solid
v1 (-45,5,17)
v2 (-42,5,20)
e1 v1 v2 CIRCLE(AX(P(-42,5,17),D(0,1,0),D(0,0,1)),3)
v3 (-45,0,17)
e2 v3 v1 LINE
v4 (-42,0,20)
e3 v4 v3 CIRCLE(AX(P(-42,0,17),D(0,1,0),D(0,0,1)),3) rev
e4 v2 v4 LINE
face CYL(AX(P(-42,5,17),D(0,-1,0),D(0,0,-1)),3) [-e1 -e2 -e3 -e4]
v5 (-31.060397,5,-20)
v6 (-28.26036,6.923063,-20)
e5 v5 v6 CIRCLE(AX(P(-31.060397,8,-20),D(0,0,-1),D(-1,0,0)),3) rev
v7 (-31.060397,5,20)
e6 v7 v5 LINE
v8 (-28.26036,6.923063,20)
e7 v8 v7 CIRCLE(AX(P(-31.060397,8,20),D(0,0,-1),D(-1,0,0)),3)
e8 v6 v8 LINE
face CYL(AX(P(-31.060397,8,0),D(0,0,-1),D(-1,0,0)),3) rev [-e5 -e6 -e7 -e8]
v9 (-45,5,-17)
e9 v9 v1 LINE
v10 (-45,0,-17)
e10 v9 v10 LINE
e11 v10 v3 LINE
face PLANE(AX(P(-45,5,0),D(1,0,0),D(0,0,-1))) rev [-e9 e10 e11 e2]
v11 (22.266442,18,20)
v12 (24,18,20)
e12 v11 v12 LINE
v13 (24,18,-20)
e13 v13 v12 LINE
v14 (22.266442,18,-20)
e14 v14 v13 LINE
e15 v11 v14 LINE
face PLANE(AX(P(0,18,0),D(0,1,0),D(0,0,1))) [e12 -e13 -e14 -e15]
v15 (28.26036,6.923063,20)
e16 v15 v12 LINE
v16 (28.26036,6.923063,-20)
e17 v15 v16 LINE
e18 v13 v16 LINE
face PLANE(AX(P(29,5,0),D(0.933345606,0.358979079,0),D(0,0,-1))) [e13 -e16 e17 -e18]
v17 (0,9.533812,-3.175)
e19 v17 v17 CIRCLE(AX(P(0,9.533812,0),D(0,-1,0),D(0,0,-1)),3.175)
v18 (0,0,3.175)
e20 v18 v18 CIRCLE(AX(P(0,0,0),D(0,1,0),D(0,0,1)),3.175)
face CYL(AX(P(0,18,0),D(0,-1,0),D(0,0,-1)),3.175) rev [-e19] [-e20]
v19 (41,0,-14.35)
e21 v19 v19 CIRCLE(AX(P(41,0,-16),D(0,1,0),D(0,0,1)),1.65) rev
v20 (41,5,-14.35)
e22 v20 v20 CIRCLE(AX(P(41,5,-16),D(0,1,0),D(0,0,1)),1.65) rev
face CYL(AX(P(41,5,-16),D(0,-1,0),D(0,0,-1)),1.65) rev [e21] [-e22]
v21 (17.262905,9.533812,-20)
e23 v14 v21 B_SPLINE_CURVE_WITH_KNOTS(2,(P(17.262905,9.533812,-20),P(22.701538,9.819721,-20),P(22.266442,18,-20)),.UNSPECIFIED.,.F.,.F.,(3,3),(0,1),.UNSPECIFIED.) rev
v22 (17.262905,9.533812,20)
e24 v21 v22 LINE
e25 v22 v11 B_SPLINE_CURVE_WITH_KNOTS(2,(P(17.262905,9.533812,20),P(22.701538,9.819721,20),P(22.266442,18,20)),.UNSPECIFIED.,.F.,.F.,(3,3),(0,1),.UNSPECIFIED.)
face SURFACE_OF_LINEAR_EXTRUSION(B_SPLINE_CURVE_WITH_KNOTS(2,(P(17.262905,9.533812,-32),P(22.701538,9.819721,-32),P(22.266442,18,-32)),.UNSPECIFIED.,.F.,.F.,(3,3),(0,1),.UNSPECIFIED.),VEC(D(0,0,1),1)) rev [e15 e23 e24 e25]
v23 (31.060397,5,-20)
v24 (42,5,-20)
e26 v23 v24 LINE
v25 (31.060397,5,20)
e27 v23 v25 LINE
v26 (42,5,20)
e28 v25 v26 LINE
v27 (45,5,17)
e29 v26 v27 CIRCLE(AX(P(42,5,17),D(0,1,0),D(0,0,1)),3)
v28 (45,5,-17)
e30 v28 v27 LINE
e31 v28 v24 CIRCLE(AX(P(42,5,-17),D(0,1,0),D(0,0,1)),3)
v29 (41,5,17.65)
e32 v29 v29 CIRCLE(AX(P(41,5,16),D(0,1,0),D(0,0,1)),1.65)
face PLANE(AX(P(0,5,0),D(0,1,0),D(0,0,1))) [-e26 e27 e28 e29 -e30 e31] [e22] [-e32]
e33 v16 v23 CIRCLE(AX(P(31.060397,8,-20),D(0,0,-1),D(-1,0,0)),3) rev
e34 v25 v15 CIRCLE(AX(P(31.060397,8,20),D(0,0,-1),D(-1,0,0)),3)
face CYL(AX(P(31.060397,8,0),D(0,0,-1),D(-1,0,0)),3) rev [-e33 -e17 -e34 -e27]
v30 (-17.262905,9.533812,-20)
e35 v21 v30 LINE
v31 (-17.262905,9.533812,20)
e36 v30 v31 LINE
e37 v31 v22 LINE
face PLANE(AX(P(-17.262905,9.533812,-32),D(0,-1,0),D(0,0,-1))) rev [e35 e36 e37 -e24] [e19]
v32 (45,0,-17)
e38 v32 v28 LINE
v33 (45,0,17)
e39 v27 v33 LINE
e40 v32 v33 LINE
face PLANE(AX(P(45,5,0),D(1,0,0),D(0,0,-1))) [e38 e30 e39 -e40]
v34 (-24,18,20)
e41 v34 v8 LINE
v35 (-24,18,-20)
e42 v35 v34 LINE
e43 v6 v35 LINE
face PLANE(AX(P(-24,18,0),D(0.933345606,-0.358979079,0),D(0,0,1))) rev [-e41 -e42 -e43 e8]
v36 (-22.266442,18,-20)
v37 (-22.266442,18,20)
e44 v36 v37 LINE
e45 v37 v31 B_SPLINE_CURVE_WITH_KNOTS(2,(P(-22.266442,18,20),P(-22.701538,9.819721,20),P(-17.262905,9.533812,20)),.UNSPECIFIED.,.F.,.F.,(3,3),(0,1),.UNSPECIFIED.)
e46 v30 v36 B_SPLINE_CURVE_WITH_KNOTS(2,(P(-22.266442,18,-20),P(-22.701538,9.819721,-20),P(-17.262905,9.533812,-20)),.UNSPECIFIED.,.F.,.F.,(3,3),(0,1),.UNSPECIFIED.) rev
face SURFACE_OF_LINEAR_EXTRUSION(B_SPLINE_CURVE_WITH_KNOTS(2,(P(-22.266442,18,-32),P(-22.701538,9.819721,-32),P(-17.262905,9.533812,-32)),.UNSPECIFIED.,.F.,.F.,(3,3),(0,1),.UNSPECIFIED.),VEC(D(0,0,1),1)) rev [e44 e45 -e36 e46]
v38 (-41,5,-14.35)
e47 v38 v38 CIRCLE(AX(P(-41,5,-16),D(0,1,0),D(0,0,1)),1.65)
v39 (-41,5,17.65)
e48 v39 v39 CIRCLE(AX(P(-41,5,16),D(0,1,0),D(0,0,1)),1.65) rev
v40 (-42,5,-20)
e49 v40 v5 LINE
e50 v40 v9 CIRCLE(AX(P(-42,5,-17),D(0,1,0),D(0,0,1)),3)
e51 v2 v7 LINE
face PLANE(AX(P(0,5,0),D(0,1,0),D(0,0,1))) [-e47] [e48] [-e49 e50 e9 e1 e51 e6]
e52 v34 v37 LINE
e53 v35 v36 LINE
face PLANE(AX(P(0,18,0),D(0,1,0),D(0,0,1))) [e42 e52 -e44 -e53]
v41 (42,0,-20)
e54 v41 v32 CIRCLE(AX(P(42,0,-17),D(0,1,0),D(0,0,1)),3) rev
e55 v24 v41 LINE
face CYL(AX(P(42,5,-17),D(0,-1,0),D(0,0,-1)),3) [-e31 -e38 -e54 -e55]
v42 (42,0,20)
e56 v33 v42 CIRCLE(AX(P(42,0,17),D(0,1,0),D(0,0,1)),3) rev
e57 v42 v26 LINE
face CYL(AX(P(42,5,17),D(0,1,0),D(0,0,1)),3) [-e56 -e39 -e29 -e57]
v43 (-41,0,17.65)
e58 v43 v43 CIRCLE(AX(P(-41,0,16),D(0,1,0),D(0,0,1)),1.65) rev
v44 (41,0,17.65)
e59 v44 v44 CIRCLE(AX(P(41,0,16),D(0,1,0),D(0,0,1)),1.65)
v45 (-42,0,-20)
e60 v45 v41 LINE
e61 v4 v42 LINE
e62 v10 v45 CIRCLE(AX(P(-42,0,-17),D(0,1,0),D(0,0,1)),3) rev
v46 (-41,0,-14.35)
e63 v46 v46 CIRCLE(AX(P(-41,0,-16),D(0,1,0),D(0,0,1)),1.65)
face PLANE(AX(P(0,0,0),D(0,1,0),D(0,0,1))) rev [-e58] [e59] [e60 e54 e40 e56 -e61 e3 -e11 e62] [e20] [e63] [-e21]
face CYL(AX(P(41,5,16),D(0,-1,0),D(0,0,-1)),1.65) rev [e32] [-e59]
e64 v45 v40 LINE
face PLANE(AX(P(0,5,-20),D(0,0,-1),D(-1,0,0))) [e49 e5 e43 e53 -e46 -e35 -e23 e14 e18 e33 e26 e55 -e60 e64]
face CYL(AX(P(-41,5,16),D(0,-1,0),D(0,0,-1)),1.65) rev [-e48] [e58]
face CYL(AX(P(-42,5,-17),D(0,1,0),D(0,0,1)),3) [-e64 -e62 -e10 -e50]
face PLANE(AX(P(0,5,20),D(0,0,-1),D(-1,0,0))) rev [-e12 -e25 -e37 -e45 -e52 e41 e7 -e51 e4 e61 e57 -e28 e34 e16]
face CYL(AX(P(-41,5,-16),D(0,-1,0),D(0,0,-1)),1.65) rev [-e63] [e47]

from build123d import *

# Parameters (mm, degrees)
CROQUIS1_W                = 21
CROQUIS1_H                = 40
CROQUIS1_R                = 1.65
SALIENTE_EXTRUIR1_DEPTH   = 5
SALIENTE_EXTRUIR1_2_DEPTH = 5
CROQUIS1_3_W              = 48
CROQUIS1_3_H              = 40
CROQUIS1_3_R              = 3.175
SALIENTE_EXTRUIR2_DEPTH   = 18
CORTAR_EXTRUIR1_DEPTH     = 52
CHAFL_N1_SIZE2            = 13
CHAFL_N1_SIZE             = 5
CHAFL_N2_SIZE2            = 13
CHAFL_N2_SIZE             = 5
REDONDEO1_R               = 3
REDONDEO2_R               = 3


with BuildPart() as part:
    # Croquis1 → Saliente-Extruir1 (new body)
    with BuildSketch(Plane(origin=(0, 0, 0), x_dir=(1, 0, 0), z_dir=(0, 1, 0))):
        with Locations((-34.5, 0)):
            Rectangle(CROQUIS1_W, CROQUIS1_H)
        with Locations(Location((-41, -16, 0), (0, 0, 270))):
            Circle(CROQUIS1_R, mode=Mode.SUBTRACT)
        with Locations(Location((-41, 16, 0), (0, 0, 270))):
            Circle(CROQUIS1_R, mode=Mode.SUBTRACT)
    extrude(amount=SALIENTE_EXTRUIR1_DEPTH)



with BuildPart() as body_2:
    # Croquis1 → Saliente-Extruir1 2 (new body)
    with BuildSketch(Plane(origin=(0, 0, 0), x_dir=(1, 0, 0), z_dir=(0, 1, 0))):
        with Locations((34.5, 0)):
            Rectangle(CROQUIS1_W, CROQUIS1_H)
        with Locations(Location((41, -16, 0), (0, 0, 270))):
            Circle(CROQUIS1_R, mode=Mode.SUBTRACT)
        with Locations(Location((41, 16, 0), (0, 0, 270))):
            Circle(CROQUIS1_R, mode=Mode.SUBTRACT)
    extrude(amount=SALIENTE_EXTRUIR1_2_DEPTH)


with BuildPart() as part_1:
    add(part.part)

    add(body_2.part)  # Saliente-Extruir2 merges body 2
    # Croquis1<3> → Saliente-Extruir2 (add)
    with BuildSketch(Plane(origin=(0, 0, 0), x_dir=(1, 0, 0), z_dir=(0, 1, 0))):
        Rectangle(CROQUIS1_3_W, CROQUIS1_3_H)
        with Locations(Location((0, 0, 0), (0, 0, 270))):
            Circle(CROQUIS1_3_R, mode=Mode.SUBTRACT)
    extrude(amount=SALIENTE_EXTRUIR2_DEPTH)

    # Croquis2 → Cortar-Extruir1 (cut)
    with BuildSketch(Plane.XY.offset(20)):
        with BuildLine():
            Line((-17.262904506, 9.533811896), (17.262904506, 9.533811896))
            add(Edge.make_bspline(
                [(22.266442187, 18), (22.701537977, 9.819720853), (17.262904506, 9.533811896)],
                knots=[0, 0, 0, 1, 1, 1], degree=2))
            Line((22.266442187, 18), (-22.266442187, 18))
            add(Edge.make_bspline(
                [(-22.266442187, 18), (-22.701537977, 9.819720853), (-17.262904506, 9.533811896)],
                knots=[0, 0, 0, 1, 1, 1], degree=2))
        make_face()
    extrude(amount=-CORTAR_EXTRUIR1_DEPTH, mode=Mode.SUBTRACT)

    # Chaflán1
    chafl_n1_edges = [part_1.edges().sort_by_distance(p)[0] for p in [
        (-24, 5, 0),
    ]]
    chafl_n1_side = [part_1.faces().sort_by_distance(p)[0] for p in [
        (-24.1, 5, 0),
    ]]
    chamfer(chafl_n1_edges, length=CHAFL_N1_SIZE - 0.0001, length2=CHAFL_N1_SIZE2 - 0.0001, reference=chafl_n1_side[0])  # a hair under: the kernel refuses the full size

    # Chaflán2
    chafl_n2_edges = [part_1.edges().sort_by_distance(p)[0] for p in [
        (24, 5, 0),
    ]]
    chafl_n2_side = [part_1.faces().sort_by_distance(p)[0] for p in [
        (24.1, 5, 0),
    ]]
    chamfer(chafl_n2_edges, length=CHAFL_N2_SIZE - 0.0001, length2=CHAFL_N2_SIZE2 - 0.0001, reference=chafl_n2_side[0])  # a hair under: the kernel refuses the full size

    # Redondeo1
    redondeo1_edges = [part_1.edges().sort_by_distance(p)[0] for p in [
        (-28.9999, 5, 0),
        (28.9999, 5, 0),
    ]]
    fillet(redondeo1_edges, radius=REDONDEO1_R)

    # Redondeo2
    redondeo2_edges = [part_1.edges().sort_by_distance(p)[0] for p in [
        (-45, 2.5, 20),
        (-45, 2.5, -20),
        (45, 2.5, -20),
        (45, 2.5, 20),
    ]]
    fillet(redondeo2_edges, radius=REDONDEO2_R)


solid = part_1.part
